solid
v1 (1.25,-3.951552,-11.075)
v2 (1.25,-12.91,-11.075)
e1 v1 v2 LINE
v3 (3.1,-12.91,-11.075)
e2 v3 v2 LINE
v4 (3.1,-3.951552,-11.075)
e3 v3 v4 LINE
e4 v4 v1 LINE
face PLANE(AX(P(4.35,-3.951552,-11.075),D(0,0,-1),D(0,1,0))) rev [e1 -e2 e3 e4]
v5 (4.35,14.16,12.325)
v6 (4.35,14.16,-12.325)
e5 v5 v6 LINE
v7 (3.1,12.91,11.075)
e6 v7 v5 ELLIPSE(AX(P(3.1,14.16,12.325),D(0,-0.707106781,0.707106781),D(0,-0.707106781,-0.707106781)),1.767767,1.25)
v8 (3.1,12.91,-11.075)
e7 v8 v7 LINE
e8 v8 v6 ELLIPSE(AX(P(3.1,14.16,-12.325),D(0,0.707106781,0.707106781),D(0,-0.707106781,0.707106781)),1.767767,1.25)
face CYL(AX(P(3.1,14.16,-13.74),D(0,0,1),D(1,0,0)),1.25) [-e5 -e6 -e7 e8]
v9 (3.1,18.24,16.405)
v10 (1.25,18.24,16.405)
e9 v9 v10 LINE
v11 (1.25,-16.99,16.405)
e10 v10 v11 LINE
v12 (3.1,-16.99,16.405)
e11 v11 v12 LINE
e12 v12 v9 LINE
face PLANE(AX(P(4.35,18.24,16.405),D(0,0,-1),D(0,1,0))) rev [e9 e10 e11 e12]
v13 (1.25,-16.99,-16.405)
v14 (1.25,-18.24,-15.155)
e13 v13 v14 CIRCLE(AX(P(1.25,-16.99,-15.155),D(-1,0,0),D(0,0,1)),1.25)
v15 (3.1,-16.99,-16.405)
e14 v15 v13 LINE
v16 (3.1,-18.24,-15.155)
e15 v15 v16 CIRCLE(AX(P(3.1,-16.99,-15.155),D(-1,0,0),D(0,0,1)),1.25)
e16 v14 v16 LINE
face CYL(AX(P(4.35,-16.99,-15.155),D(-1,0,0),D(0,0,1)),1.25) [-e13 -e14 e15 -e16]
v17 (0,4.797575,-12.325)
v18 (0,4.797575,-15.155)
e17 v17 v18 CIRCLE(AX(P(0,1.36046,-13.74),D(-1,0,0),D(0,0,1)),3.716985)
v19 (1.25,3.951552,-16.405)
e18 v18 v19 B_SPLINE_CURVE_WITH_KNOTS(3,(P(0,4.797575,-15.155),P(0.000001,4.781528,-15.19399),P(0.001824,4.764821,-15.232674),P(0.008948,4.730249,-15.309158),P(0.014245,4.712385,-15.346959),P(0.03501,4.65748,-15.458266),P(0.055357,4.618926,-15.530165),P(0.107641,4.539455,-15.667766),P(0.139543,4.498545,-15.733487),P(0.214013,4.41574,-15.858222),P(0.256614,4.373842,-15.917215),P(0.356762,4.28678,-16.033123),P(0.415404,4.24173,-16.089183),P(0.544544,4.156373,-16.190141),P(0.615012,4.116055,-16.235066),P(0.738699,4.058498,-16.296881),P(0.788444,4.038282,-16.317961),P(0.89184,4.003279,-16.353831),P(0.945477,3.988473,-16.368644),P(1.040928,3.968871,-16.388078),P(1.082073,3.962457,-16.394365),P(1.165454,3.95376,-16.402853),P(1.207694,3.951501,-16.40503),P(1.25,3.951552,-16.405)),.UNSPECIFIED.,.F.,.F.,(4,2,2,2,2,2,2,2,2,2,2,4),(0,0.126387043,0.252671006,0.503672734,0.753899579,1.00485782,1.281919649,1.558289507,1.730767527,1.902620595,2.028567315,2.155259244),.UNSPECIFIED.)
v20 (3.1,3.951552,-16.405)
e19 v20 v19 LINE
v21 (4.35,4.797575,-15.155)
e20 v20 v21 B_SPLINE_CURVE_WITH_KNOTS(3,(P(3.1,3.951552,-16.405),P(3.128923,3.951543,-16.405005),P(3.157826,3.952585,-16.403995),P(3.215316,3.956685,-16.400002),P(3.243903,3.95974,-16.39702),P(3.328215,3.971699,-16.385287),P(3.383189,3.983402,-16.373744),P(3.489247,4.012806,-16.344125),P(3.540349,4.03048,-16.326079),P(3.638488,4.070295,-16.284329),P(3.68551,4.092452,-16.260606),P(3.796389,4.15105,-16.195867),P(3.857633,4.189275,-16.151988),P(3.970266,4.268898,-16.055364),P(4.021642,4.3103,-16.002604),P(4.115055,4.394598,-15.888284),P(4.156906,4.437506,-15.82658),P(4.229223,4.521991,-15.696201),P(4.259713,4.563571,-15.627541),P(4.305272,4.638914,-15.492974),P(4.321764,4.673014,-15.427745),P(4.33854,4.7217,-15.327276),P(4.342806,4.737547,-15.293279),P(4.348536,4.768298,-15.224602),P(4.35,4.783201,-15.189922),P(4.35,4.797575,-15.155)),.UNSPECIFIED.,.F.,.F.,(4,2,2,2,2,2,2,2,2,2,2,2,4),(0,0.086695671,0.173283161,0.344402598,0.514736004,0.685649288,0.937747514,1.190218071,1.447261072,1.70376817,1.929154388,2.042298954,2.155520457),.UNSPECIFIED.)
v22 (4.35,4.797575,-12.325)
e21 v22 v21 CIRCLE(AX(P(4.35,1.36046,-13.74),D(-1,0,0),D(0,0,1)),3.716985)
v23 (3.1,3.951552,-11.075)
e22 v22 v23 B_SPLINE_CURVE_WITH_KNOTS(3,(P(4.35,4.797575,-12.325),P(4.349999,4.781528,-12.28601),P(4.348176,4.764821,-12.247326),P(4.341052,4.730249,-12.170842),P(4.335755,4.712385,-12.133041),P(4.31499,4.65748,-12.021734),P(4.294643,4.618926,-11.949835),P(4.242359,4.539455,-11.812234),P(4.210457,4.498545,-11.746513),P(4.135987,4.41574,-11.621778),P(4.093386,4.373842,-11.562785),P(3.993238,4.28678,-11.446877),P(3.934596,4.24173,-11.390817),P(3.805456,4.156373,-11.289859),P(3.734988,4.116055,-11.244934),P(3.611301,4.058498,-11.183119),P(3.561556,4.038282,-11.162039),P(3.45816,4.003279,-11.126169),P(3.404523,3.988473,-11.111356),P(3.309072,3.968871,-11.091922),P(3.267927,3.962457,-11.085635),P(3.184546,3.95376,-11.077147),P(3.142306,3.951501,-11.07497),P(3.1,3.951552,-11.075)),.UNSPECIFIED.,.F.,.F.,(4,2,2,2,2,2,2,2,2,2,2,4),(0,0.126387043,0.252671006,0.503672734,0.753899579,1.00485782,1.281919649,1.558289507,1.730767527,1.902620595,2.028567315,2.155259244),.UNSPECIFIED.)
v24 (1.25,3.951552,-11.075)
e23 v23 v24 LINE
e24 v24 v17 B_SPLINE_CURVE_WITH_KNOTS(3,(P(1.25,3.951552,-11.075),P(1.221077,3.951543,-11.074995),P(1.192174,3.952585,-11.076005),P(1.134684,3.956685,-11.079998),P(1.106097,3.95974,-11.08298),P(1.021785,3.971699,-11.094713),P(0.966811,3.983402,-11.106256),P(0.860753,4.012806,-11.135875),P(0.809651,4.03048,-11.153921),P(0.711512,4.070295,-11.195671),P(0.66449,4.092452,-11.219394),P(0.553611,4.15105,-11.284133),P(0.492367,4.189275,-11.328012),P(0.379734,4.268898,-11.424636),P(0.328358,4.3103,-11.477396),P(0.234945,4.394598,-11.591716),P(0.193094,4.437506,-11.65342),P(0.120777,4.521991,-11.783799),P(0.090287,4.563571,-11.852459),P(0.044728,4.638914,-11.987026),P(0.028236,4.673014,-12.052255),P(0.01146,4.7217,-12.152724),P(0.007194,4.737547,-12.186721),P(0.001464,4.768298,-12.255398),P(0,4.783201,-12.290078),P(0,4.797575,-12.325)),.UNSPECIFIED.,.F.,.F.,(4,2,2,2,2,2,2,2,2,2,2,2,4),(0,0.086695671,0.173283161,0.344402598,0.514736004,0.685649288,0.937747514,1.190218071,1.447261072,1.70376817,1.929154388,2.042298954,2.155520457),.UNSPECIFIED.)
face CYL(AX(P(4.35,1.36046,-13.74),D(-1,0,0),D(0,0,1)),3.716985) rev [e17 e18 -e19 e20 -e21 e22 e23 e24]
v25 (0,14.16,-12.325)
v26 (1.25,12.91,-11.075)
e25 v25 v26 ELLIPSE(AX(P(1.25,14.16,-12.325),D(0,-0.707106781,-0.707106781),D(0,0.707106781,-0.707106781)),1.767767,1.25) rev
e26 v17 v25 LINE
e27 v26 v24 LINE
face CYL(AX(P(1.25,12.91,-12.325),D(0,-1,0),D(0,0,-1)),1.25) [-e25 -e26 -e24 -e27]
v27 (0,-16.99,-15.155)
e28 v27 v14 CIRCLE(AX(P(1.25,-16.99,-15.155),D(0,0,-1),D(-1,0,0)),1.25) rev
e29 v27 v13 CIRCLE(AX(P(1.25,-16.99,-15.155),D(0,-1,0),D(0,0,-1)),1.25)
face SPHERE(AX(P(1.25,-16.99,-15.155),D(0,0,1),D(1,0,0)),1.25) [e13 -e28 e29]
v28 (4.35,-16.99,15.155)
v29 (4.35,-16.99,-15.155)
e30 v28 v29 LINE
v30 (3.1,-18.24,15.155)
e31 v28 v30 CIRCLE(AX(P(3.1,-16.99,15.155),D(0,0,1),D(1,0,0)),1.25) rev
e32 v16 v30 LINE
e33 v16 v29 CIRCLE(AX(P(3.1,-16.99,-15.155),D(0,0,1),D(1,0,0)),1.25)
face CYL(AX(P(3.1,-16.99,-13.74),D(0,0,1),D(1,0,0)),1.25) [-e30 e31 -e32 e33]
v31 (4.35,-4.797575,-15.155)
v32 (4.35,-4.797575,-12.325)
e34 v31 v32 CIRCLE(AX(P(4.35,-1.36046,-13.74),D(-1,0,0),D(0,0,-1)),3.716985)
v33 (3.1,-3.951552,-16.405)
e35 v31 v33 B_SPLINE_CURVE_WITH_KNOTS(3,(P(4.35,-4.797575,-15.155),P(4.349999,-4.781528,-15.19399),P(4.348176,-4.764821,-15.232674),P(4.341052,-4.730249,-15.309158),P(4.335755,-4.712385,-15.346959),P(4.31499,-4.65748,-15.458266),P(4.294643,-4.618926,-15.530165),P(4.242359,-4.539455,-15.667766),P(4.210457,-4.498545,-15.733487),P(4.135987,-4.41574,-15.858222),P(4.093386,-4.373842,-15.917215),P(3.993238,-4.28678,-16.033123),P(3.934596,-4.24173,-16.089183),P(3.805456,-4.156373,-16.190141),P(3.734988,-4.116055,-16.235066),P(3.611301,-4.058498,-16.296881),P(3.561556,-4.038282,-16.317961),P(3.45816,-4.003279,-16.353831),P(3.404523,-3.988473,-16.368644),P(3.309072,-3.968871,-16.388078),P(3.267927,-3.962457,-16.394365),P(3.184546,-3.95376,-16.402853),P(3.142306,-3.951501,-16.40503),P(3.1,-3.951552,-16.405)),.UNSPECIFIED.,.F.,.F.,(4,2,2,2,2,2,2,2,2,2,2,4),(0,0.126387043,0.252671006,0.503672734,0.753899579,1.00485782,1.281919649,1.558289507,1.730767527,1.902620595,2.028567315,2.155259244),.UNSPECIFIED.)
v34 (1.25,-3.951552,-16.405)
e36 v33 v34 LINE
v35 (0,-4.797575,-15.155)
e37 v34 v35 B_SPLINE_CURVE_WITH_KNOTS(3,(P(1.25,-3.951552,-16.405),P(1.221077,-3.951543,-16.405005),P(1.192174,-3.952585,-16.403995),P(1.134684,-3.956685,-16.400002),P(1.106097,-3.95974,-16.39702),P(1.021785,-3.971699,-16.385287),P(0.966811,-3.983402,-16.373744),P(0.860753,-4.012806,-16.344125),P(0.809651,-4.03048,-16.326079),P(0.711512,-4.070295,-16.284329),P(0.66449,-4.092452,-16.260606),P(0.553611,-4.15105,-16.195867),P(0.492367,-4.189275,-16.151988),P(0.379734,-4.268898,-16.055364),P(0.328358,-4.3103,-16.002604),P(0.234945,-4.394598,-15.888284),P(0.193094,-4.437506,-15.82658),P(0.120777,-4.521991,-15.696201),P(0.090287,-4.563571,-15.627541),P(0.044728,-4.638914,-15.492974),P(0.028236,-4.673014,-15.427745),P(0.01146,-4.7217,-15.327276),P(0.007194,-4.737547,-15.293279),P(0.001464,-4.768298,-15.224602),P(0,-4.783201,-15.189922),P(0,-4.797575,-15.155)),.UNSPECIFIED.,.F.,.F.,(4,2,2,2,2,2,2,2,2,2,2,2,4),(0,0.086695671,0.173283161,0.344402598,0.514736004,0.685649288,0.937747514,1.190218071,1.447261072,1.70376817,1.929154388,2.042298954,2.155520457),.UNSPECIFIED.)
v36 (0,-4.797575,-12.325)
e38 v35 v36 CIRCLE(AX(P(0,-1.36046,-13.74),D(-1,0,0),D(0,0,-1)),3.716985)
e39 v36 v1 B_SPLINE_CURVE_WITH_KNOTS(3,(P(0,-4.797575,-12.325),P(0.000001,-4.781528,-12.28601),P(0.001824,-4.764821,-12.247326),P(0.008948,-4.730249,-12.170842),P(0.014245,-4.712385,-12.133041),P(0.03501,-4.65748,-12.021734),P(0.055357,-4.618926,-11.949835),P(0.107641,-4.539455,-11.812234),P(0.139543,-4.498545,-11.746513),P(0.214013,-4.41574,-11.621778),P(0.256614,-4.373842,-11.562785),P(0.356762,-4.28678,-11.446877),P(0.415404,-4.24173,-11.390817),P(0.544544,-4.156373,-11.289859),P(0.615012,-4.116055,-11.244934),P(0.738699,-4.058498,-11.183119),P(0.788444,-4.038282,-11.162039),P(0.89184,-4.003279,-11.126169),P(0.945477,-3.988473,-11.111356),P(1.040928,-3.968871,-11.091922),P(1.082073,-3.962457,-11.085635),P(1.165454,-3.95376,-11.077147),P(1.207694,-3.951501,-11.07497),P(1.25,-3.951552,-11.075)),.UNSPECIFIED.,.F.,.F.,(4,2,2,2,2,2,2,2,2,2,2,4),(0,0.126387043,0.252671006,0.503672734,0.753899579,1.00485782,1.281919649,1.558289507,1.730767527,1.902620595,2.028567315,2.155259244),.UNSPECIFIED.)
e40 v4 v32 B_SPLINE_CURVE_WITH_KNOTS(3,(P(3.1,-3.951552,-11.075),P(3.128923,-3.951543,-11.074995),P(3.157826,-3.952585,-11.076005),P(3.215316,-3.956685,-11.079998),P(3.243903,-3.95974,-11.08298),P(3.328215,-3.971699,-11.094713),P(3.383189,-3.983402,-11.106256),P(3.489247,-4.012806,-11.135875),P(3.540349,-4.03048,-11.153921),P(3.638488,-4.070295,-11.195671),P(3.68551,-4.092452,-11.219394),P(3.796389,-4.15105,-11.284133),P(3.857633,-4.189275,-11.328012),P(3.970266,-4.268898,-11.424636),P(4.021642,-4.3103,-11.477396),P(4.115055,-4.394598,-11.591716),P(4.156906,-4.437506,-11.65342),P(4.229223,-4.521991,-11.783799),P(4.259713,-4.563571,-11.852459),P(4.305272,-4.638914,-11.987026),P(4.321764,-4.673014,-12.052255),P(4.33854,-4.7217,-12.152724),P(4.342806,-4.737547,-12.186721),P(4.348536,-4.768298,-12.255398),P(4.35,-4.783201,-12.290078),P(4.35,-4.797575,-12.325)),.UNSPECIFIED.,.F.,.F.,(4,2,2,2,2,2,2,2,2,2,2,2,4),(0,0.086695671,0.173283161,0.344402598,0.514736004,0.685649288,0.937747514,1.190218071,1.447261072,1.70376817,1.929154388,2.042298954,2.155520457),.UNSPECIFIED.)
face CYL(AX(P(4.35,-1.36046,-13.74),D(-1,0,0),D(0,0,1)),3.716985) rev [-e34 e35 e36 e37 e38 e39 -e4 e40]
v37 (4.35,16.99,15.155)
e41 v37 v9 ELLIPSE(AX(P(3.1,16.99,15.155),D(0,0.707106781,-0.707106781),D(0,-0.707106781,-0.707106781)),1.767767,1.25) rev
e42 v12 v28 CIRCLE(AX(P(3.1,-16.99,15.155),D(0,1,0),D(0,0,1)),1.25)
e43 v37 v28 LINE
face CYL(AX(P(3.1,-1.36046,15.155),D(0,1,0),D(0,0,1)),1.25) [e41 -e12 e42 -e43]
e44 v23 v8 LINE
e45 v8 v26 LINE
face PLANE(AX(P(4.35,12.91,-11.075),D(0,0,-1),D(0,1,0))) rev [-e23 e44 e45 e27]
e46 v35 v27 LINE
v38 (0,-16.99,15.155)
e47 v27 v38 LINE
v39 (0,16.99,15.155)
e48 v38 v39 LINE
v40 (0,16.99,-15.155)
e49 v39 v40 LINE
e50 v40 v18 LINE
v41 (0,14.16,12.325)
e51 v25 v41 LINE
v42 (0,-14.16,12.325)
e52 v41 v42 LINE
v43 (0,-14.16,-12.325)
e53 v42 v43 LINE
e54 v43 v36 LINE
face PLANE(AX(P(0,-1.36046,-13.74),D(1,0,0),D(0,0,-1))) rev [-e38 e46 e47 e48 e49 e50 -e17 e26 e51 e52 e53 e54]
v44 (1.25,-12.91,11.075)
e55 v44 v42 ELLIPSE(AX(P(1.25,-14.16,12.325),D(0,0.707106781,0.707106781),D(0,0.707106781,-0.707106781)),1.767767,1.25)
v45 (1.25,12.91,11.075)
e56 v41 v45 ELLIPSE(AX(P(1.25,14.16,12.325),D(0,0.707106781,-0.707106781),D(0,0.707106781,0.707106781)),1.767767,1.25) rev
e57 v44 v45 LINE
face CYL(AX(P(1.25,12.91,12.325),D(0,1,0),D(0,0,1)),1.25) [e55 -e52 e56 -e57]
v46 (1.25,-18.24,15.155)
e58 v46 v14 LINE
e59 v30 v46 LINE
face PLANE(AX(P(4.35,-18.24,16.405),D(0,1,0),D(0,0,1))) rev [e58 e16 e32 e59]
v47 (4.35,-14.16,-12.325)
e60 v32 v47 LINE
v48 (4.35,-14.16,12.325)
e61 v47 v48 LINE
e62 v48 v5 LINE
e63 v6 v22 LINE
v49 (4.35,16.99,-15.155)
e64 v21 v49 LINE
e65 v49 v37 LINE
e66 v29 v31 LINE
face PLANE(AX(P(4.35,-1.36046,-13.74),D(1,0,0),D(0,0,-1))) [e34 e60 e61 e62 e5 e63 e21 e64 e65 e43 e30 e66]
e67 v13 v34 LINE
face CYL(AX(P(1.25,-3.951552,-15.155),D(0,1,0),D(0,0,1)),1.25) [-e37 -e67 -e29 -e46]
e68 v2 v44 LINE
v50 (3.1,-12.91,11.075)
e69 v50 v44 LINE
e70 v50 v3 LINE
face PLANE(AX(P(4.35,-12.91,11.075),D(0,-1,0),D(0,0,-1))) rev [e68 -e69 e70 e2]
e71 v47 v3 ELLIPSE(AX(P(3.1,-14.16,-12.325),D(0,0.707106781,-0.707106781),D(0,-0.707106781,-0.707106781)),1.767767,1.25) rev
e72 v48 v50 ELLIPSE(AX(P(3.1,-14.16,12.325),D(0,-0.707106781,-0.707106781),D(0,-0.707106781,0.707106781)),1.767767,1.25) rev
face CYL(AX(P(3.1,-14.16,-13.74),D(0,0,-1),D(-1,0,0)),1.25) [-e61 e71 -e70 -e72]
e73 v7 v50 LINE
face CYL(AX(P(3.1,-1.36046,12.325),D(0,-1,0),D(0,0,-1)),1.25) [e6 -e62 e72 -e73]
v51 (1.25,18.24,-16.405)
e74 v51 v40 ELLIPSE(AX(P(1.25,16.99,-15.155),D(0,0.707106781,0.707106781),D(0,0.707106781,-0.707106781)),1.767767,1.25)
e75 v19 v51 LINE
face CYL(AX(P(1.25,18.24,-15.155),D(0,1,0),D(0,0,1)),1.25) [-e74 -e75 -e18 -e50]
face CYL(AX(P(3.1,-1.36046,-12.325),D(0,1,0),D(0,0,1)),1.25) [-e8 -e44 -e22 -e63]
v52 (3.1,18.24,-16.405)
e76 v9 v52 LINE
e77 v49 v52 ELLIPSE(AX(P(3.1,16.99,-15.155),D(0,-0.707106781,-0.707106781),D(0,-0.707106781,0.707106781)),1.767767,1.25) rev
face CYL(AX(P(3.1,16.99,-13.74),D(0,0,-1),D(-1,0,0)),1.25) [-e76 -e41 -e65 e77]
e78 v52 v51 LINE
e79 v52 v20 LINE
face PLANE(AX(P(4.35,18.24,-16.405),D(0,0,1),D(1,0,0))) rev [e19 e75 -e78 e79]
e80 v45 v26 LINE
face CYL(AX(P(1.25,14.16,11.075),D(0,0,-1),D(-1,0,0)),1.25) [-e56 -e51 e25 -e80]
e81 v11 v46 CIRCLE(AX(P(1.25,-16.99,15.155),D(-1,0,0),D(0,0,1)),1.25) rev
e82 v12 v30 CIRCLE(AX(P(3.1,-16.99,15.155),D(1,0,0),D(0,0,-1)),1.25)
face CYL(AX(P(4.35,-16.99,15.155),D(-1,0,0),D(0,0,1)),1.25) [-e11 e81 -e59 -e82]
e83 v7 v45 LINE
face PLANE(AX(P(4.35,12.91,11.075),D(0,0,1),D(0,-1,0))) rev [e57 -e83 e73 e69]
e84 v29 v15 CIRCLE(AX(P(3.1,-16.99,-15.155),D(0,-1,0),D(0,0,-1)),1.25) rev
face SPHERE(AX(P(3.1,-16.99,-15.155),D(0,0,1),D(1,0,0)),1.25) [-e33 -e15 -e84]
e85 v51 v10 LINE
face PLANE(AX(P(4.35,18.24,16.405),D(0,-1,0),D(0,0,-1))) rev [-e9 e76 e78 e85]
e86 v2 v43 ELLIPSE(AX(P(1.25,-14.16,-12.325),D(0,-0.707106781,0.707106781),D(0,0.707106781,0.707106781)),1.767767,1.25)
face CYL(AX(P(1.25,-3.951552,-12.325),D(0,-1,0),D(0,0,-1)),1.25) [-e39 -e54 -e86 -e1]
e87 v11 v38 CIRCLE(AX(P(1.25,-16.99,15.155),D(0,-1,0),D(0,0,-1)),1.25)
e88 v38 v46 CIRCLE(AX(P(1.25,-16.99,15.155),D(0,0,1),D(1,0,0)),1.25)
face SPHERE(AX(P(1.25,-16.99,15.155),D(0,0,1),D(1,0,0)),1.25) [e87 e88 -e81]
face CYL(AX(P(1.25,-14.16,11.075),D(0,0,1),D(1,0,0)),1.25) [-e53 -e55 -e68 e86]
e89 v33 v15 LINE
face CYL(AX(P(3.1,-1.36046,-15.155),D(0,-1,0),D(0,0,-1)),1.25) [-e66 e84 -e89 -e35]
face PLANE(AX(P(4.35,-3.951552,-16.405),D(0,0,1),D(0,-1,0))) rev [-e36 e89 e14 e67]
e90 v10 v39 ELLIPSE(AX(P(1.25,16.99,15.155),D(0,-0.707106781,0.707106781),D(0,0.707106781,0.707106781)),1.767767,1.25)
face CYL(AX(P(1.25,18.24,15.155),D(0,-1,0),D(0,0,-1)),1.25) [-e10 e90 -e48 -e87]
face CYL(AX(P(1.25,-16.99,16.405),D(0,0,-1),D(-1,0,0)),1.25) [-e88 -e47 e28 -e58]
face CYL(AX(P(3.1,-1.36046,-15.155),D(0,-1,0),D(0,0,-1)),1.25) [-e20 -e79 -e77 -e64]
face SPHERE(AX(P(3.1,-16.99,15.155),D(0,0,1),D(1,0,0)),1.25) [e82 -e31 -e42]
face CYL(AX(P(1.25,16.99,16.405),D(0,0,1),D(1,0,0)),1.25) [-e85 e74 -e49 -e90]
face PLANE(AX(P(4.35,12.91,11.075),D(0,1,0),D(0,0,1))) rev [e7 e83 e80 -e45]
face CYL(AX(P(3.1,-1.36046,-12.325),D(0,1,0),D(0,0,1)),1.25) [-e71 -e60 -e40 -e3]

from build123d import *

# Parameters (mm, degrees)
BOSS_EXTRUDE1_DEPTH = 4.35
FILLET1_R           = 1.25
FILLET2_R           = 1.25


with BuildPart() as part:
    # Sketch1 → Boss-Extrude1 (new body)
    with BuildSketch(Plane(origin=(0, 0, 0), x_dir=(0, 0, -1), z_dir=(1, 0, 0))):
        with BuildLine():
            Line((-11.075, 12.91), (11.075, 12.91))
            Line((11.075, 12.91), (11.075, 3.951551724))
            ThreePointArc((11.075, 3.951551724), (13.74, 5.077445529), (16.405, 3.951551724))
            Line((16.405, 3.951551724), (16.405, 18.24))
            Line((16.405, 18.24), (-16.405, 18.24))
            Line((-16.405, 18.24), (-16.405, -18.24))
            Line((-16.405, -18.24), (16.405, -18.24))
            Line((16.405, -18.24), (16.405, -3.951551724))
            ThreePointArc((16.405, -3.951551724), (13.74, -5.077445529), (11.075, -3.951551724))
            Line((11.075, -3.951551724), (11.075, -12.91))
            Line((11.075, -12.91), (-11.075, -12.91))
            Line((-11.075, -12.91), (-11.075, 12.91))
        make_face()
    extrude(amount=BOSS_EXTRUDE1_DEPTH)

    # Fillet1
    fillet1_edges = [part.edges().sort_by_distance(p)[0] for p in [
        (4.35, 8.430775862, -11.075),
        (4.35, 11.095775862, -16.405),
        (4.35, 18.24, 0),
        (4.35, 0, 16.405),
        (4.35, -18.24, 0),
        (4.35, -11.095775862, -16.405),
        (4.35, -8.430775862, -11.075),
        (4.35, -12.91, 0),
        (4.35, 0, 11.075),
        (4.35, 12.91, 0),
    ]]
    fillet(fillet1_edges, radius=FILLET1_R)

    # Fillet2
    # the kernel refuses this fillet: 1.25 mm, written as the material it takes off along each edge
    with BuildSketch(Plane(origin=(3.1, -16.99, -15.155), x_dir=(0, -1, 0), z_dir=(0, 0, -1))) as fillet2_piece_1_section:
        Polygon((0, 0), (FILLET2_R, 0), (FILLET2_R, -FILLET2_R), (0, -FILLET2_R), align=None)
    fillet2_piece_1 = extrude(amount=FILLET2_R, mode=Mode.PRIVATE)
    fillet2_piece_1 = fillet2_piece_1 - Plane(origin=(3.1, -16.99, -15.155), x_dir=(-0.7071067811865475, 0.7071067811865475, 0), z_dir=(0, 0, -1)) * Sphere(FILLET2_R, mode=Mode.PRIVATE)
    add(fillet2_piece_1, mode=Mode.SUBTRACT)
    with BuildSketch(Plane(origin=(3.1, -16.99, 15.155), x_dir=(0, -1, 0), z_dir=(0, 0, 1))) as fillet2_piece_2_section:
        Polygon((0, 0), (FILLET2_R, 0), (FILLET2_R, FILLET2_R), (0, FILLET2_R), align=None)
    fillet2_piece_2 = extrude(amount=FILLET2_R, mode=Mode.PRIVATE)
    fillet2_piece_2 = fillet2_piece_2 - Plane(origin=(3.1, -16.99, 15.155), x_dir=(-0.7071067811865475, 0.7071067811865475, 0), z_dir=(0, 0, 1)) * Sphere(FILLET2_R, mode=Mode.PRIVATE)
    add(fillet2_piece_2, mode=Mode.SUBTRACT)
    with BuildSketch(Plane(origin=(1.25, -16.99, -15.155), x_dir=(-1, 0, 0), z_dir=(0, -1, 0))) as fillet2_piece_3_section:
        Polygon((0, 0), (FILLET2_R, 0), (FILLET2_R, FILLET2_R), (0, FILLET2_R), align=None)
    fillet2_piece_3 = extrude(amount=FILLET2_R, mode=Mode.PRIVATE)
    fillet2_piece_3 = fillet2_piece_3 - Plane(origin=(1.25, -16.99, -15.155), x_dir=(0.7071067811865475, 0, 0.7071067811865475), z_dir=(0, -1, 0)) * Sphere(FILLET2_R, mode=Mode.PRIVATE)
    add(fillet2_piece_3, mode=Mode.SUBTRACT)
    with BuildSketch(Plane(origin=(1.25, -16.99, 15.155), x_dir=(-1, 0, 0), z_dir=(0, -1, 0))) as fillet2_piece_4_section:
        Polygon((0, 0), (FILLET2_R, 0), (FILLET2_R, -FILLET2_R), (0, -FILLET2_R), align=None)
    fillet2_piece_4 = extrude(amount=FILLET2_R, mode=Mode.PRIVATE)
    fillet2_piece_4 = fillet2_piece_4 - Plane(origin=(1.25, -16.99, 15.155), x_dir=(0.7071067811865475, 0, -0.7071067811865475), z_dir=(0, -1, 0)) * Sphere(FILLET2_R, mode=Mode.PRIVATE)
    add(fillet2_piece_4, mode=Mode.SUBTRACT)
    with BuildSketch(Plane(origin=(0, -12.91, -11.075), x_dir=(0, -1, 0), z_dir=(0, 0, 1)), Plane(origin=(0, 12.91, 11.075), x_dir=(0, 1, 0), z_dir=(0, 0, -1))) as fillet2_piece_5:
        with BuildLine():
            CenterArc((FILLET2_R, FILLET2_R), FILLET2_R, 180, 90)
            Line((0, FILLET2_R), (0, 0))
            Line((0, 0), (FILLET2_R, 0))
        make_face()
    extrude(amount=22.15, mode=Mode.SUBTRACT)
    with BuildSketch(Plane(origin=(0, -0.826551724, -11.075), x_dir=(1, 0, 0), z_dir=(0, -1, 0))) as fillet2_piece_6:
        with BuildLine():
            CenterArc((FILLET2_R, -FILLET2_R), FILLET2_R, 90, 90)
            Line((0, -FILLET2_R), (0, 0))
            Line((0, 0), (FILLET2_R, 0))
        make_face()
    extrude(amount=12.083448276, mode=Mode.SUBTRACT)
    with BuildSketch(Plane(origin=(0, -16.99, -16.405), x_dir=(0, 0, 1), z_dir=(0, 1, 0))) as fillet2_piece_7:
        with BuildLine():
            CenterArc((FILLET2_R, FILLET2_R), FILLET2_R, 180, 90)
            Line((0, FILLET2_R), (0, 0))
            Line((0, 0), (FILLET2_R, 0))
        make_face()
    extrude(amount=16.163448276, mode=Mode.SUBTRACT)
    with BuildSketch(Plane(origin=(0, -18.24, 15.155), x_dir=(0, 1, 0), z_dir=(0, 0, -1))) as fillet2_piece_8:
        with BuildLine():
            CenterArc((FILLET2_R, FILLET2_R), FILLET2_R, 180, 90)
            Line((0, FILLET2_R), (0, 0))
            Line((0, 0), (FILLET2_R, 0))
        make_face()
    extrude(amount=30.31, mode=Mode.SUBTRACT)
    with BuildSketch(Plane(origin=(0, 21.365, 16.405), x_dir=(0, 0, -1), z_dir=(0, -1, 0))) as fillet2_piece_9:
        with BuildLine():
            CenterArc((FILLET2_R, FILLET2_R), FILLET2_R, 180, 90)
            Line((0, FILLET2_R), (0, 0))
            Line((0, 0), (FILLET2_R, 0))
        make_face()
    extrude(amount=38.355, mode=Mode.SUBTRACT)
    with BuildSketch(Plane(origin=(0, 18.24, -19.53), x_dir=(0, -1, 0), z_dir=(0, 0, 1))) as fillet2_piece_10:
        with BuildLine():
            CenterArc((FILLET2_R, FILLET2_R), FILLET2_R, 180, 90)
            Line((0, FILLET2_R), (0, 0))
            Line((0, 0), (FILLET2_R, 0))
        make_face()
    extrude(amount=39.06, mode=Mode.SUBTRACT)
    with BuildSketch(Plane(origin=(0, 0.826551724, -16.405), x_dir=(0, 0, 1), z_dir=(0, 1, 0))) as fillet2_piece_11:
        with BuildLine():
            CenterArc((FILLET2_R, FILLET2_R), FILLET2_R, 180, 90)
            Line((0, FILLET2_R), (0, 0))
            Line((0, 0), (FILLET2_R, 0))
        make_face()
    extrude(amount=20.538448276, mode=Mode.SUBTRACT)
    with BuildSketch(Plane(origin=(0, 12.91, -11.075), x_dir=(0, 0, -1), z_dir=(0, -1, 0))) as fillet2_piece_12:
        with BuildLine():
            CenterArc((FILLET2_R, FILLET2_R), FILLET2_R, 180, 90)
            Line((0, FILLET2_R), (0, 0))
            Line((0, 0), (FILLET2_R, 0))
        make_face()
    extrude(amount=12.083448276, mode=Mode.SUBTRACT)
    with BuildSketch(Plane(origin=(0, -12.91, 11.075), x_dir=(0, 0, 1), z_dir=(0, 1, 0))) as fillet2_piece_13:
        with BuildLine():
            CenterArc((FILLET2_R, FILLET2_R), FILLET2_R, 180, 90)
            Line((0, FILLET2_R), (0, 0))
            Line((0, 0), (FILLET2_R, 0))
        make_face()
    extrude(amount=25.82, mode=Mode.SUBTRACT)
    with BuildSketch(Plane(origin=(1.25, -18.24, 16.405), x_dir=(0, 1, 0), z_dir=(1, 0, 0))) as fillet2_piece_14:
        with BuildLine():
            CenterArc((FILLET2_R, -FILLET2_R), FILLET2_R, 90, 90)
            Line((0, -FILLET2_R), (0, 0))
            Line((0, 0), (FILLET2_R, 0))
        make_face()
    extrude(amount=1.85, mode=Mode.SUBTRACT)
    with BuildSketch(Plane(origin=(1.25, -18.24, -16.405), x_dir=(0, 1, 0), z_dir=(1, 0, 0))) as fillet2_piece_15:
        with BuildLine():
            CenterArc((FILLET2_R, FILLET2_R), FILLET2_R, 180, 90)
            Line((0, FILLET2_R), (0, 0))
            Line((0, 0), (FILLET2_R, 0))
        make_face()
    extrude(amount=1.85, mode=Mode.SUBTRACT)
    with BuildSketch(Plane(origin=(0, -0.826551724, -11.075), x_dir=(1, 0, 0), z_dir=(0, -1, 0))) as fillet2_piece_16a_section:
        with BuildLine():
            CenterArc((FILLET2_R, -FILLET2_R), FILLET2_R, 90, 90)
            Line((0, -FILLET2_R), (0, 0))
            Line((0, 0), (FILLET2_R, 0))
        make_face()
    fillet2_piece_16a = extrude(amount=15.208448276, mode=Mode.PRIVATE)
    fillet2_piece_16a = split(fillet2_piece_16a, bisect_by=Plane(origin=(0.282993893, -12.91, -11.357993893), z_dir=(0, -1, 0)), keep=Keep.TOP, mode=Mode.PRIVATE)
    with BuildSketch(Plane(origin=(0, -12.91, -14.2), x_dir=(0, -1, 0), z_dir=(0, 0, 1))) as fillet2_piece_16b_section:
        with BuildLine():
            CenterArc((FILLET2_R, FILLET2_R), FILLET2_R, 180, 90)
            Line((0, FILLET2_R), (0, 0))
            Line((0, 0), (FILLET2_R, 0))
        make_face()
    fillet2_piece_16b = extrude(amount=25.275, mode=Mode.PRIVATE)
    fillet2_piece_16b = split(fillet2_piece_16b, bisect_by=Plane(origin=(0.282993893, -13.192993893, -11.075), z_dir=(0, 0, -1)), keep=Keep.TOP, mode=Mode.PRIVATE)
    fillet2_piece_16 = fillet2_piece_16a & fillet2_piece_16b
    add(fillet2_piece_16, mode=Mode.SUBTRACT)
    with BuildSketch(Plane(origin=(0, -12.91, -11.075), x_dir=(0, -1, 0), z_dir=(0, 0, 1))) as fillet2_piece_17a_section:
        with BuildLine():
            CenterArc((FILLET2_R, FILLET2_R), FILLET2_R, 180, 90)
            Line((0, FILLET2_R), (0, 0))
            Line((0, 0), (FILLET2_R, 0))
        make_face()
    fillet2_piece_17a = extrude(amount=25.275, mode=Mode.PRIVATE)
    fillet2_piece_17a = split(fillet2_piece_17a, bisect_by=Plane(origin=(0.282993893, -13.192993893, 11.075), z_dir=(0, 0, 1)), keep=Keep.TOP, mode=Mode.PRIVATE)
    with BuildSketch(Plane(origin=(0, -16.035, 11.075), x_dir=(0, 0, 1), z_dir=(0, 1, 0))) as fillet2_piece_17b_section:
        with BuildLine():
            CenterArc((FILLET2_R, FILLET2_R), FILLET2_R, 180, 90)
            Line((0, FILLET2_R), (0, 0))
            Line((0, 0), (FILLET2_R, 0))
        make_face()
    fillet2_piece_17b = extrude(amount=28.945, mode=Mode.PRIVATE)
    fillet2_piece_17b = split(fillet2_piece_17b, bisect_by=Plane(origin=(0.282993893, -12.91, 11.357993893), z_dir=(0, -1, 0)), keep=Keep.TOP, mode=Mode.PRIVATE)
    fillet2_piece_17 = fillet2_piece_17a & fillet2_piece_17b
    add(fillet2_piece_17, mode=Mode.SUBTRACT)
    with BuildSketch(Plane(origin=(0, 12.91, 11.075), x_dir=(0, 1, 0), z_dir=(0, 0, -1))) as fillet2_piece_18a_section:
        with BuildLine():
            CenterArc((FILLET2_R, FILLET2_R), FILLET2_R, 180, 90)
            Line((0, FILLET2_R), (0, 0))
            Line((0, 0), (FILLET2_R, 0))
        make_face()
    fillet2_piece_18a = extrude(amount=25.275, mode=Mode.PRIVATE)
    fillet2_piece_18a = split(fillet2_piece_18a, bisect_by=Plane(origin=(0.282993893, 13.192993893, -11.075), z_dir=(0, 0, -1)), keep=Keep.TOP, mode=Mode.PRIVATE)
    with BuildSketch(Plane(origin=(0, 16.035, -11.075), x_dir=(0, 0, -1), z_dir=(0, -1, 0))) as fillet2_piece_18b_section:
        with BuildLine():
            CenterArc((FILLET2_R, FILLET2_R), FILLET2_R, 180, 90)
            Line((0, FILLET2_R), (0, 0))
            Line((0, 0), (FILLET2_R, 0))
        make_face()
    fillet2_piece_18b = extrude(amount=15.208448276, mode=Mode.PRIVATE)
    fillet2_piece_18b = split(fillet2_piece_18b, bisect_by=Plane(origin=(0.282993893, 12.91, -11.357993893), z_dir=(0, 1, 0)), keep=Keep.TOP, mode=Mode.PRIVATE)
    fillet2_piece_18 = fillet2_piece_18a & fillet2_piece_18b
    add(fillet2_piece_18, mode=Mode.SUBTRACT)
    with BuildSketch(Plane(origin=(0, -12.91, 11.075), x_dir=(0, 0, 1), z_dir=(0, 1, 0))) as fillet2_piece_19a_section:
        with BuildLine():
            CenterArc((FILLET2_R, FILLET2_R), FILLET2_R, 180, 90)
            Line((0, FILLET2_R), (0, 0))
            Line((0, 0), (FILLET2_R, 0))
        make_face()
    fillet2_piece_19a = extrude(amount=28.945, mode=Mode.PRIVATE)
    fillet2_piece_19a = split(fillet2_piece_19a, bisect_by=Plane(origin=(0.282993893, 12.91, 11.357993893), z_dir=(0, 1, 0)), keep=Keep.TOP, mode=Mode.PRIVATE)
    with BuildSketch(Plane(origin=(0, 12.91, 14.2), x_dir=(0, 1, 0), z_dir=(0, 0, -1))) as fillet2_piece_19b_section:
        with BuildLine():
            CenterArc((FILLET2_R, FILLET2_R), FILLET2_R, 180, 90)
            Line((0, FILLET2_R), (0, 0))
            Line((0, 0), (FILLET2_R, 0))
        make_face()
    fillet2_piece_19b = extrude(amount=25.275, mode=Mode.PRIVATE)
    fillet2_piece_19b = split(fillet2_piece_19b, bisect_by=Plane(origin=(0.282993893, 13.192993893, 11.075), z_dir=(0, 0, 1)), keep=Keep.TOP, mode=Mode.PRIVATE)
    fillet2_piece_19 = fillet2_piece_19a & fillet2_piece_19b
    add(fillet2_piece_19, mode=Mode.SUBTRACT)


solid = part.part
